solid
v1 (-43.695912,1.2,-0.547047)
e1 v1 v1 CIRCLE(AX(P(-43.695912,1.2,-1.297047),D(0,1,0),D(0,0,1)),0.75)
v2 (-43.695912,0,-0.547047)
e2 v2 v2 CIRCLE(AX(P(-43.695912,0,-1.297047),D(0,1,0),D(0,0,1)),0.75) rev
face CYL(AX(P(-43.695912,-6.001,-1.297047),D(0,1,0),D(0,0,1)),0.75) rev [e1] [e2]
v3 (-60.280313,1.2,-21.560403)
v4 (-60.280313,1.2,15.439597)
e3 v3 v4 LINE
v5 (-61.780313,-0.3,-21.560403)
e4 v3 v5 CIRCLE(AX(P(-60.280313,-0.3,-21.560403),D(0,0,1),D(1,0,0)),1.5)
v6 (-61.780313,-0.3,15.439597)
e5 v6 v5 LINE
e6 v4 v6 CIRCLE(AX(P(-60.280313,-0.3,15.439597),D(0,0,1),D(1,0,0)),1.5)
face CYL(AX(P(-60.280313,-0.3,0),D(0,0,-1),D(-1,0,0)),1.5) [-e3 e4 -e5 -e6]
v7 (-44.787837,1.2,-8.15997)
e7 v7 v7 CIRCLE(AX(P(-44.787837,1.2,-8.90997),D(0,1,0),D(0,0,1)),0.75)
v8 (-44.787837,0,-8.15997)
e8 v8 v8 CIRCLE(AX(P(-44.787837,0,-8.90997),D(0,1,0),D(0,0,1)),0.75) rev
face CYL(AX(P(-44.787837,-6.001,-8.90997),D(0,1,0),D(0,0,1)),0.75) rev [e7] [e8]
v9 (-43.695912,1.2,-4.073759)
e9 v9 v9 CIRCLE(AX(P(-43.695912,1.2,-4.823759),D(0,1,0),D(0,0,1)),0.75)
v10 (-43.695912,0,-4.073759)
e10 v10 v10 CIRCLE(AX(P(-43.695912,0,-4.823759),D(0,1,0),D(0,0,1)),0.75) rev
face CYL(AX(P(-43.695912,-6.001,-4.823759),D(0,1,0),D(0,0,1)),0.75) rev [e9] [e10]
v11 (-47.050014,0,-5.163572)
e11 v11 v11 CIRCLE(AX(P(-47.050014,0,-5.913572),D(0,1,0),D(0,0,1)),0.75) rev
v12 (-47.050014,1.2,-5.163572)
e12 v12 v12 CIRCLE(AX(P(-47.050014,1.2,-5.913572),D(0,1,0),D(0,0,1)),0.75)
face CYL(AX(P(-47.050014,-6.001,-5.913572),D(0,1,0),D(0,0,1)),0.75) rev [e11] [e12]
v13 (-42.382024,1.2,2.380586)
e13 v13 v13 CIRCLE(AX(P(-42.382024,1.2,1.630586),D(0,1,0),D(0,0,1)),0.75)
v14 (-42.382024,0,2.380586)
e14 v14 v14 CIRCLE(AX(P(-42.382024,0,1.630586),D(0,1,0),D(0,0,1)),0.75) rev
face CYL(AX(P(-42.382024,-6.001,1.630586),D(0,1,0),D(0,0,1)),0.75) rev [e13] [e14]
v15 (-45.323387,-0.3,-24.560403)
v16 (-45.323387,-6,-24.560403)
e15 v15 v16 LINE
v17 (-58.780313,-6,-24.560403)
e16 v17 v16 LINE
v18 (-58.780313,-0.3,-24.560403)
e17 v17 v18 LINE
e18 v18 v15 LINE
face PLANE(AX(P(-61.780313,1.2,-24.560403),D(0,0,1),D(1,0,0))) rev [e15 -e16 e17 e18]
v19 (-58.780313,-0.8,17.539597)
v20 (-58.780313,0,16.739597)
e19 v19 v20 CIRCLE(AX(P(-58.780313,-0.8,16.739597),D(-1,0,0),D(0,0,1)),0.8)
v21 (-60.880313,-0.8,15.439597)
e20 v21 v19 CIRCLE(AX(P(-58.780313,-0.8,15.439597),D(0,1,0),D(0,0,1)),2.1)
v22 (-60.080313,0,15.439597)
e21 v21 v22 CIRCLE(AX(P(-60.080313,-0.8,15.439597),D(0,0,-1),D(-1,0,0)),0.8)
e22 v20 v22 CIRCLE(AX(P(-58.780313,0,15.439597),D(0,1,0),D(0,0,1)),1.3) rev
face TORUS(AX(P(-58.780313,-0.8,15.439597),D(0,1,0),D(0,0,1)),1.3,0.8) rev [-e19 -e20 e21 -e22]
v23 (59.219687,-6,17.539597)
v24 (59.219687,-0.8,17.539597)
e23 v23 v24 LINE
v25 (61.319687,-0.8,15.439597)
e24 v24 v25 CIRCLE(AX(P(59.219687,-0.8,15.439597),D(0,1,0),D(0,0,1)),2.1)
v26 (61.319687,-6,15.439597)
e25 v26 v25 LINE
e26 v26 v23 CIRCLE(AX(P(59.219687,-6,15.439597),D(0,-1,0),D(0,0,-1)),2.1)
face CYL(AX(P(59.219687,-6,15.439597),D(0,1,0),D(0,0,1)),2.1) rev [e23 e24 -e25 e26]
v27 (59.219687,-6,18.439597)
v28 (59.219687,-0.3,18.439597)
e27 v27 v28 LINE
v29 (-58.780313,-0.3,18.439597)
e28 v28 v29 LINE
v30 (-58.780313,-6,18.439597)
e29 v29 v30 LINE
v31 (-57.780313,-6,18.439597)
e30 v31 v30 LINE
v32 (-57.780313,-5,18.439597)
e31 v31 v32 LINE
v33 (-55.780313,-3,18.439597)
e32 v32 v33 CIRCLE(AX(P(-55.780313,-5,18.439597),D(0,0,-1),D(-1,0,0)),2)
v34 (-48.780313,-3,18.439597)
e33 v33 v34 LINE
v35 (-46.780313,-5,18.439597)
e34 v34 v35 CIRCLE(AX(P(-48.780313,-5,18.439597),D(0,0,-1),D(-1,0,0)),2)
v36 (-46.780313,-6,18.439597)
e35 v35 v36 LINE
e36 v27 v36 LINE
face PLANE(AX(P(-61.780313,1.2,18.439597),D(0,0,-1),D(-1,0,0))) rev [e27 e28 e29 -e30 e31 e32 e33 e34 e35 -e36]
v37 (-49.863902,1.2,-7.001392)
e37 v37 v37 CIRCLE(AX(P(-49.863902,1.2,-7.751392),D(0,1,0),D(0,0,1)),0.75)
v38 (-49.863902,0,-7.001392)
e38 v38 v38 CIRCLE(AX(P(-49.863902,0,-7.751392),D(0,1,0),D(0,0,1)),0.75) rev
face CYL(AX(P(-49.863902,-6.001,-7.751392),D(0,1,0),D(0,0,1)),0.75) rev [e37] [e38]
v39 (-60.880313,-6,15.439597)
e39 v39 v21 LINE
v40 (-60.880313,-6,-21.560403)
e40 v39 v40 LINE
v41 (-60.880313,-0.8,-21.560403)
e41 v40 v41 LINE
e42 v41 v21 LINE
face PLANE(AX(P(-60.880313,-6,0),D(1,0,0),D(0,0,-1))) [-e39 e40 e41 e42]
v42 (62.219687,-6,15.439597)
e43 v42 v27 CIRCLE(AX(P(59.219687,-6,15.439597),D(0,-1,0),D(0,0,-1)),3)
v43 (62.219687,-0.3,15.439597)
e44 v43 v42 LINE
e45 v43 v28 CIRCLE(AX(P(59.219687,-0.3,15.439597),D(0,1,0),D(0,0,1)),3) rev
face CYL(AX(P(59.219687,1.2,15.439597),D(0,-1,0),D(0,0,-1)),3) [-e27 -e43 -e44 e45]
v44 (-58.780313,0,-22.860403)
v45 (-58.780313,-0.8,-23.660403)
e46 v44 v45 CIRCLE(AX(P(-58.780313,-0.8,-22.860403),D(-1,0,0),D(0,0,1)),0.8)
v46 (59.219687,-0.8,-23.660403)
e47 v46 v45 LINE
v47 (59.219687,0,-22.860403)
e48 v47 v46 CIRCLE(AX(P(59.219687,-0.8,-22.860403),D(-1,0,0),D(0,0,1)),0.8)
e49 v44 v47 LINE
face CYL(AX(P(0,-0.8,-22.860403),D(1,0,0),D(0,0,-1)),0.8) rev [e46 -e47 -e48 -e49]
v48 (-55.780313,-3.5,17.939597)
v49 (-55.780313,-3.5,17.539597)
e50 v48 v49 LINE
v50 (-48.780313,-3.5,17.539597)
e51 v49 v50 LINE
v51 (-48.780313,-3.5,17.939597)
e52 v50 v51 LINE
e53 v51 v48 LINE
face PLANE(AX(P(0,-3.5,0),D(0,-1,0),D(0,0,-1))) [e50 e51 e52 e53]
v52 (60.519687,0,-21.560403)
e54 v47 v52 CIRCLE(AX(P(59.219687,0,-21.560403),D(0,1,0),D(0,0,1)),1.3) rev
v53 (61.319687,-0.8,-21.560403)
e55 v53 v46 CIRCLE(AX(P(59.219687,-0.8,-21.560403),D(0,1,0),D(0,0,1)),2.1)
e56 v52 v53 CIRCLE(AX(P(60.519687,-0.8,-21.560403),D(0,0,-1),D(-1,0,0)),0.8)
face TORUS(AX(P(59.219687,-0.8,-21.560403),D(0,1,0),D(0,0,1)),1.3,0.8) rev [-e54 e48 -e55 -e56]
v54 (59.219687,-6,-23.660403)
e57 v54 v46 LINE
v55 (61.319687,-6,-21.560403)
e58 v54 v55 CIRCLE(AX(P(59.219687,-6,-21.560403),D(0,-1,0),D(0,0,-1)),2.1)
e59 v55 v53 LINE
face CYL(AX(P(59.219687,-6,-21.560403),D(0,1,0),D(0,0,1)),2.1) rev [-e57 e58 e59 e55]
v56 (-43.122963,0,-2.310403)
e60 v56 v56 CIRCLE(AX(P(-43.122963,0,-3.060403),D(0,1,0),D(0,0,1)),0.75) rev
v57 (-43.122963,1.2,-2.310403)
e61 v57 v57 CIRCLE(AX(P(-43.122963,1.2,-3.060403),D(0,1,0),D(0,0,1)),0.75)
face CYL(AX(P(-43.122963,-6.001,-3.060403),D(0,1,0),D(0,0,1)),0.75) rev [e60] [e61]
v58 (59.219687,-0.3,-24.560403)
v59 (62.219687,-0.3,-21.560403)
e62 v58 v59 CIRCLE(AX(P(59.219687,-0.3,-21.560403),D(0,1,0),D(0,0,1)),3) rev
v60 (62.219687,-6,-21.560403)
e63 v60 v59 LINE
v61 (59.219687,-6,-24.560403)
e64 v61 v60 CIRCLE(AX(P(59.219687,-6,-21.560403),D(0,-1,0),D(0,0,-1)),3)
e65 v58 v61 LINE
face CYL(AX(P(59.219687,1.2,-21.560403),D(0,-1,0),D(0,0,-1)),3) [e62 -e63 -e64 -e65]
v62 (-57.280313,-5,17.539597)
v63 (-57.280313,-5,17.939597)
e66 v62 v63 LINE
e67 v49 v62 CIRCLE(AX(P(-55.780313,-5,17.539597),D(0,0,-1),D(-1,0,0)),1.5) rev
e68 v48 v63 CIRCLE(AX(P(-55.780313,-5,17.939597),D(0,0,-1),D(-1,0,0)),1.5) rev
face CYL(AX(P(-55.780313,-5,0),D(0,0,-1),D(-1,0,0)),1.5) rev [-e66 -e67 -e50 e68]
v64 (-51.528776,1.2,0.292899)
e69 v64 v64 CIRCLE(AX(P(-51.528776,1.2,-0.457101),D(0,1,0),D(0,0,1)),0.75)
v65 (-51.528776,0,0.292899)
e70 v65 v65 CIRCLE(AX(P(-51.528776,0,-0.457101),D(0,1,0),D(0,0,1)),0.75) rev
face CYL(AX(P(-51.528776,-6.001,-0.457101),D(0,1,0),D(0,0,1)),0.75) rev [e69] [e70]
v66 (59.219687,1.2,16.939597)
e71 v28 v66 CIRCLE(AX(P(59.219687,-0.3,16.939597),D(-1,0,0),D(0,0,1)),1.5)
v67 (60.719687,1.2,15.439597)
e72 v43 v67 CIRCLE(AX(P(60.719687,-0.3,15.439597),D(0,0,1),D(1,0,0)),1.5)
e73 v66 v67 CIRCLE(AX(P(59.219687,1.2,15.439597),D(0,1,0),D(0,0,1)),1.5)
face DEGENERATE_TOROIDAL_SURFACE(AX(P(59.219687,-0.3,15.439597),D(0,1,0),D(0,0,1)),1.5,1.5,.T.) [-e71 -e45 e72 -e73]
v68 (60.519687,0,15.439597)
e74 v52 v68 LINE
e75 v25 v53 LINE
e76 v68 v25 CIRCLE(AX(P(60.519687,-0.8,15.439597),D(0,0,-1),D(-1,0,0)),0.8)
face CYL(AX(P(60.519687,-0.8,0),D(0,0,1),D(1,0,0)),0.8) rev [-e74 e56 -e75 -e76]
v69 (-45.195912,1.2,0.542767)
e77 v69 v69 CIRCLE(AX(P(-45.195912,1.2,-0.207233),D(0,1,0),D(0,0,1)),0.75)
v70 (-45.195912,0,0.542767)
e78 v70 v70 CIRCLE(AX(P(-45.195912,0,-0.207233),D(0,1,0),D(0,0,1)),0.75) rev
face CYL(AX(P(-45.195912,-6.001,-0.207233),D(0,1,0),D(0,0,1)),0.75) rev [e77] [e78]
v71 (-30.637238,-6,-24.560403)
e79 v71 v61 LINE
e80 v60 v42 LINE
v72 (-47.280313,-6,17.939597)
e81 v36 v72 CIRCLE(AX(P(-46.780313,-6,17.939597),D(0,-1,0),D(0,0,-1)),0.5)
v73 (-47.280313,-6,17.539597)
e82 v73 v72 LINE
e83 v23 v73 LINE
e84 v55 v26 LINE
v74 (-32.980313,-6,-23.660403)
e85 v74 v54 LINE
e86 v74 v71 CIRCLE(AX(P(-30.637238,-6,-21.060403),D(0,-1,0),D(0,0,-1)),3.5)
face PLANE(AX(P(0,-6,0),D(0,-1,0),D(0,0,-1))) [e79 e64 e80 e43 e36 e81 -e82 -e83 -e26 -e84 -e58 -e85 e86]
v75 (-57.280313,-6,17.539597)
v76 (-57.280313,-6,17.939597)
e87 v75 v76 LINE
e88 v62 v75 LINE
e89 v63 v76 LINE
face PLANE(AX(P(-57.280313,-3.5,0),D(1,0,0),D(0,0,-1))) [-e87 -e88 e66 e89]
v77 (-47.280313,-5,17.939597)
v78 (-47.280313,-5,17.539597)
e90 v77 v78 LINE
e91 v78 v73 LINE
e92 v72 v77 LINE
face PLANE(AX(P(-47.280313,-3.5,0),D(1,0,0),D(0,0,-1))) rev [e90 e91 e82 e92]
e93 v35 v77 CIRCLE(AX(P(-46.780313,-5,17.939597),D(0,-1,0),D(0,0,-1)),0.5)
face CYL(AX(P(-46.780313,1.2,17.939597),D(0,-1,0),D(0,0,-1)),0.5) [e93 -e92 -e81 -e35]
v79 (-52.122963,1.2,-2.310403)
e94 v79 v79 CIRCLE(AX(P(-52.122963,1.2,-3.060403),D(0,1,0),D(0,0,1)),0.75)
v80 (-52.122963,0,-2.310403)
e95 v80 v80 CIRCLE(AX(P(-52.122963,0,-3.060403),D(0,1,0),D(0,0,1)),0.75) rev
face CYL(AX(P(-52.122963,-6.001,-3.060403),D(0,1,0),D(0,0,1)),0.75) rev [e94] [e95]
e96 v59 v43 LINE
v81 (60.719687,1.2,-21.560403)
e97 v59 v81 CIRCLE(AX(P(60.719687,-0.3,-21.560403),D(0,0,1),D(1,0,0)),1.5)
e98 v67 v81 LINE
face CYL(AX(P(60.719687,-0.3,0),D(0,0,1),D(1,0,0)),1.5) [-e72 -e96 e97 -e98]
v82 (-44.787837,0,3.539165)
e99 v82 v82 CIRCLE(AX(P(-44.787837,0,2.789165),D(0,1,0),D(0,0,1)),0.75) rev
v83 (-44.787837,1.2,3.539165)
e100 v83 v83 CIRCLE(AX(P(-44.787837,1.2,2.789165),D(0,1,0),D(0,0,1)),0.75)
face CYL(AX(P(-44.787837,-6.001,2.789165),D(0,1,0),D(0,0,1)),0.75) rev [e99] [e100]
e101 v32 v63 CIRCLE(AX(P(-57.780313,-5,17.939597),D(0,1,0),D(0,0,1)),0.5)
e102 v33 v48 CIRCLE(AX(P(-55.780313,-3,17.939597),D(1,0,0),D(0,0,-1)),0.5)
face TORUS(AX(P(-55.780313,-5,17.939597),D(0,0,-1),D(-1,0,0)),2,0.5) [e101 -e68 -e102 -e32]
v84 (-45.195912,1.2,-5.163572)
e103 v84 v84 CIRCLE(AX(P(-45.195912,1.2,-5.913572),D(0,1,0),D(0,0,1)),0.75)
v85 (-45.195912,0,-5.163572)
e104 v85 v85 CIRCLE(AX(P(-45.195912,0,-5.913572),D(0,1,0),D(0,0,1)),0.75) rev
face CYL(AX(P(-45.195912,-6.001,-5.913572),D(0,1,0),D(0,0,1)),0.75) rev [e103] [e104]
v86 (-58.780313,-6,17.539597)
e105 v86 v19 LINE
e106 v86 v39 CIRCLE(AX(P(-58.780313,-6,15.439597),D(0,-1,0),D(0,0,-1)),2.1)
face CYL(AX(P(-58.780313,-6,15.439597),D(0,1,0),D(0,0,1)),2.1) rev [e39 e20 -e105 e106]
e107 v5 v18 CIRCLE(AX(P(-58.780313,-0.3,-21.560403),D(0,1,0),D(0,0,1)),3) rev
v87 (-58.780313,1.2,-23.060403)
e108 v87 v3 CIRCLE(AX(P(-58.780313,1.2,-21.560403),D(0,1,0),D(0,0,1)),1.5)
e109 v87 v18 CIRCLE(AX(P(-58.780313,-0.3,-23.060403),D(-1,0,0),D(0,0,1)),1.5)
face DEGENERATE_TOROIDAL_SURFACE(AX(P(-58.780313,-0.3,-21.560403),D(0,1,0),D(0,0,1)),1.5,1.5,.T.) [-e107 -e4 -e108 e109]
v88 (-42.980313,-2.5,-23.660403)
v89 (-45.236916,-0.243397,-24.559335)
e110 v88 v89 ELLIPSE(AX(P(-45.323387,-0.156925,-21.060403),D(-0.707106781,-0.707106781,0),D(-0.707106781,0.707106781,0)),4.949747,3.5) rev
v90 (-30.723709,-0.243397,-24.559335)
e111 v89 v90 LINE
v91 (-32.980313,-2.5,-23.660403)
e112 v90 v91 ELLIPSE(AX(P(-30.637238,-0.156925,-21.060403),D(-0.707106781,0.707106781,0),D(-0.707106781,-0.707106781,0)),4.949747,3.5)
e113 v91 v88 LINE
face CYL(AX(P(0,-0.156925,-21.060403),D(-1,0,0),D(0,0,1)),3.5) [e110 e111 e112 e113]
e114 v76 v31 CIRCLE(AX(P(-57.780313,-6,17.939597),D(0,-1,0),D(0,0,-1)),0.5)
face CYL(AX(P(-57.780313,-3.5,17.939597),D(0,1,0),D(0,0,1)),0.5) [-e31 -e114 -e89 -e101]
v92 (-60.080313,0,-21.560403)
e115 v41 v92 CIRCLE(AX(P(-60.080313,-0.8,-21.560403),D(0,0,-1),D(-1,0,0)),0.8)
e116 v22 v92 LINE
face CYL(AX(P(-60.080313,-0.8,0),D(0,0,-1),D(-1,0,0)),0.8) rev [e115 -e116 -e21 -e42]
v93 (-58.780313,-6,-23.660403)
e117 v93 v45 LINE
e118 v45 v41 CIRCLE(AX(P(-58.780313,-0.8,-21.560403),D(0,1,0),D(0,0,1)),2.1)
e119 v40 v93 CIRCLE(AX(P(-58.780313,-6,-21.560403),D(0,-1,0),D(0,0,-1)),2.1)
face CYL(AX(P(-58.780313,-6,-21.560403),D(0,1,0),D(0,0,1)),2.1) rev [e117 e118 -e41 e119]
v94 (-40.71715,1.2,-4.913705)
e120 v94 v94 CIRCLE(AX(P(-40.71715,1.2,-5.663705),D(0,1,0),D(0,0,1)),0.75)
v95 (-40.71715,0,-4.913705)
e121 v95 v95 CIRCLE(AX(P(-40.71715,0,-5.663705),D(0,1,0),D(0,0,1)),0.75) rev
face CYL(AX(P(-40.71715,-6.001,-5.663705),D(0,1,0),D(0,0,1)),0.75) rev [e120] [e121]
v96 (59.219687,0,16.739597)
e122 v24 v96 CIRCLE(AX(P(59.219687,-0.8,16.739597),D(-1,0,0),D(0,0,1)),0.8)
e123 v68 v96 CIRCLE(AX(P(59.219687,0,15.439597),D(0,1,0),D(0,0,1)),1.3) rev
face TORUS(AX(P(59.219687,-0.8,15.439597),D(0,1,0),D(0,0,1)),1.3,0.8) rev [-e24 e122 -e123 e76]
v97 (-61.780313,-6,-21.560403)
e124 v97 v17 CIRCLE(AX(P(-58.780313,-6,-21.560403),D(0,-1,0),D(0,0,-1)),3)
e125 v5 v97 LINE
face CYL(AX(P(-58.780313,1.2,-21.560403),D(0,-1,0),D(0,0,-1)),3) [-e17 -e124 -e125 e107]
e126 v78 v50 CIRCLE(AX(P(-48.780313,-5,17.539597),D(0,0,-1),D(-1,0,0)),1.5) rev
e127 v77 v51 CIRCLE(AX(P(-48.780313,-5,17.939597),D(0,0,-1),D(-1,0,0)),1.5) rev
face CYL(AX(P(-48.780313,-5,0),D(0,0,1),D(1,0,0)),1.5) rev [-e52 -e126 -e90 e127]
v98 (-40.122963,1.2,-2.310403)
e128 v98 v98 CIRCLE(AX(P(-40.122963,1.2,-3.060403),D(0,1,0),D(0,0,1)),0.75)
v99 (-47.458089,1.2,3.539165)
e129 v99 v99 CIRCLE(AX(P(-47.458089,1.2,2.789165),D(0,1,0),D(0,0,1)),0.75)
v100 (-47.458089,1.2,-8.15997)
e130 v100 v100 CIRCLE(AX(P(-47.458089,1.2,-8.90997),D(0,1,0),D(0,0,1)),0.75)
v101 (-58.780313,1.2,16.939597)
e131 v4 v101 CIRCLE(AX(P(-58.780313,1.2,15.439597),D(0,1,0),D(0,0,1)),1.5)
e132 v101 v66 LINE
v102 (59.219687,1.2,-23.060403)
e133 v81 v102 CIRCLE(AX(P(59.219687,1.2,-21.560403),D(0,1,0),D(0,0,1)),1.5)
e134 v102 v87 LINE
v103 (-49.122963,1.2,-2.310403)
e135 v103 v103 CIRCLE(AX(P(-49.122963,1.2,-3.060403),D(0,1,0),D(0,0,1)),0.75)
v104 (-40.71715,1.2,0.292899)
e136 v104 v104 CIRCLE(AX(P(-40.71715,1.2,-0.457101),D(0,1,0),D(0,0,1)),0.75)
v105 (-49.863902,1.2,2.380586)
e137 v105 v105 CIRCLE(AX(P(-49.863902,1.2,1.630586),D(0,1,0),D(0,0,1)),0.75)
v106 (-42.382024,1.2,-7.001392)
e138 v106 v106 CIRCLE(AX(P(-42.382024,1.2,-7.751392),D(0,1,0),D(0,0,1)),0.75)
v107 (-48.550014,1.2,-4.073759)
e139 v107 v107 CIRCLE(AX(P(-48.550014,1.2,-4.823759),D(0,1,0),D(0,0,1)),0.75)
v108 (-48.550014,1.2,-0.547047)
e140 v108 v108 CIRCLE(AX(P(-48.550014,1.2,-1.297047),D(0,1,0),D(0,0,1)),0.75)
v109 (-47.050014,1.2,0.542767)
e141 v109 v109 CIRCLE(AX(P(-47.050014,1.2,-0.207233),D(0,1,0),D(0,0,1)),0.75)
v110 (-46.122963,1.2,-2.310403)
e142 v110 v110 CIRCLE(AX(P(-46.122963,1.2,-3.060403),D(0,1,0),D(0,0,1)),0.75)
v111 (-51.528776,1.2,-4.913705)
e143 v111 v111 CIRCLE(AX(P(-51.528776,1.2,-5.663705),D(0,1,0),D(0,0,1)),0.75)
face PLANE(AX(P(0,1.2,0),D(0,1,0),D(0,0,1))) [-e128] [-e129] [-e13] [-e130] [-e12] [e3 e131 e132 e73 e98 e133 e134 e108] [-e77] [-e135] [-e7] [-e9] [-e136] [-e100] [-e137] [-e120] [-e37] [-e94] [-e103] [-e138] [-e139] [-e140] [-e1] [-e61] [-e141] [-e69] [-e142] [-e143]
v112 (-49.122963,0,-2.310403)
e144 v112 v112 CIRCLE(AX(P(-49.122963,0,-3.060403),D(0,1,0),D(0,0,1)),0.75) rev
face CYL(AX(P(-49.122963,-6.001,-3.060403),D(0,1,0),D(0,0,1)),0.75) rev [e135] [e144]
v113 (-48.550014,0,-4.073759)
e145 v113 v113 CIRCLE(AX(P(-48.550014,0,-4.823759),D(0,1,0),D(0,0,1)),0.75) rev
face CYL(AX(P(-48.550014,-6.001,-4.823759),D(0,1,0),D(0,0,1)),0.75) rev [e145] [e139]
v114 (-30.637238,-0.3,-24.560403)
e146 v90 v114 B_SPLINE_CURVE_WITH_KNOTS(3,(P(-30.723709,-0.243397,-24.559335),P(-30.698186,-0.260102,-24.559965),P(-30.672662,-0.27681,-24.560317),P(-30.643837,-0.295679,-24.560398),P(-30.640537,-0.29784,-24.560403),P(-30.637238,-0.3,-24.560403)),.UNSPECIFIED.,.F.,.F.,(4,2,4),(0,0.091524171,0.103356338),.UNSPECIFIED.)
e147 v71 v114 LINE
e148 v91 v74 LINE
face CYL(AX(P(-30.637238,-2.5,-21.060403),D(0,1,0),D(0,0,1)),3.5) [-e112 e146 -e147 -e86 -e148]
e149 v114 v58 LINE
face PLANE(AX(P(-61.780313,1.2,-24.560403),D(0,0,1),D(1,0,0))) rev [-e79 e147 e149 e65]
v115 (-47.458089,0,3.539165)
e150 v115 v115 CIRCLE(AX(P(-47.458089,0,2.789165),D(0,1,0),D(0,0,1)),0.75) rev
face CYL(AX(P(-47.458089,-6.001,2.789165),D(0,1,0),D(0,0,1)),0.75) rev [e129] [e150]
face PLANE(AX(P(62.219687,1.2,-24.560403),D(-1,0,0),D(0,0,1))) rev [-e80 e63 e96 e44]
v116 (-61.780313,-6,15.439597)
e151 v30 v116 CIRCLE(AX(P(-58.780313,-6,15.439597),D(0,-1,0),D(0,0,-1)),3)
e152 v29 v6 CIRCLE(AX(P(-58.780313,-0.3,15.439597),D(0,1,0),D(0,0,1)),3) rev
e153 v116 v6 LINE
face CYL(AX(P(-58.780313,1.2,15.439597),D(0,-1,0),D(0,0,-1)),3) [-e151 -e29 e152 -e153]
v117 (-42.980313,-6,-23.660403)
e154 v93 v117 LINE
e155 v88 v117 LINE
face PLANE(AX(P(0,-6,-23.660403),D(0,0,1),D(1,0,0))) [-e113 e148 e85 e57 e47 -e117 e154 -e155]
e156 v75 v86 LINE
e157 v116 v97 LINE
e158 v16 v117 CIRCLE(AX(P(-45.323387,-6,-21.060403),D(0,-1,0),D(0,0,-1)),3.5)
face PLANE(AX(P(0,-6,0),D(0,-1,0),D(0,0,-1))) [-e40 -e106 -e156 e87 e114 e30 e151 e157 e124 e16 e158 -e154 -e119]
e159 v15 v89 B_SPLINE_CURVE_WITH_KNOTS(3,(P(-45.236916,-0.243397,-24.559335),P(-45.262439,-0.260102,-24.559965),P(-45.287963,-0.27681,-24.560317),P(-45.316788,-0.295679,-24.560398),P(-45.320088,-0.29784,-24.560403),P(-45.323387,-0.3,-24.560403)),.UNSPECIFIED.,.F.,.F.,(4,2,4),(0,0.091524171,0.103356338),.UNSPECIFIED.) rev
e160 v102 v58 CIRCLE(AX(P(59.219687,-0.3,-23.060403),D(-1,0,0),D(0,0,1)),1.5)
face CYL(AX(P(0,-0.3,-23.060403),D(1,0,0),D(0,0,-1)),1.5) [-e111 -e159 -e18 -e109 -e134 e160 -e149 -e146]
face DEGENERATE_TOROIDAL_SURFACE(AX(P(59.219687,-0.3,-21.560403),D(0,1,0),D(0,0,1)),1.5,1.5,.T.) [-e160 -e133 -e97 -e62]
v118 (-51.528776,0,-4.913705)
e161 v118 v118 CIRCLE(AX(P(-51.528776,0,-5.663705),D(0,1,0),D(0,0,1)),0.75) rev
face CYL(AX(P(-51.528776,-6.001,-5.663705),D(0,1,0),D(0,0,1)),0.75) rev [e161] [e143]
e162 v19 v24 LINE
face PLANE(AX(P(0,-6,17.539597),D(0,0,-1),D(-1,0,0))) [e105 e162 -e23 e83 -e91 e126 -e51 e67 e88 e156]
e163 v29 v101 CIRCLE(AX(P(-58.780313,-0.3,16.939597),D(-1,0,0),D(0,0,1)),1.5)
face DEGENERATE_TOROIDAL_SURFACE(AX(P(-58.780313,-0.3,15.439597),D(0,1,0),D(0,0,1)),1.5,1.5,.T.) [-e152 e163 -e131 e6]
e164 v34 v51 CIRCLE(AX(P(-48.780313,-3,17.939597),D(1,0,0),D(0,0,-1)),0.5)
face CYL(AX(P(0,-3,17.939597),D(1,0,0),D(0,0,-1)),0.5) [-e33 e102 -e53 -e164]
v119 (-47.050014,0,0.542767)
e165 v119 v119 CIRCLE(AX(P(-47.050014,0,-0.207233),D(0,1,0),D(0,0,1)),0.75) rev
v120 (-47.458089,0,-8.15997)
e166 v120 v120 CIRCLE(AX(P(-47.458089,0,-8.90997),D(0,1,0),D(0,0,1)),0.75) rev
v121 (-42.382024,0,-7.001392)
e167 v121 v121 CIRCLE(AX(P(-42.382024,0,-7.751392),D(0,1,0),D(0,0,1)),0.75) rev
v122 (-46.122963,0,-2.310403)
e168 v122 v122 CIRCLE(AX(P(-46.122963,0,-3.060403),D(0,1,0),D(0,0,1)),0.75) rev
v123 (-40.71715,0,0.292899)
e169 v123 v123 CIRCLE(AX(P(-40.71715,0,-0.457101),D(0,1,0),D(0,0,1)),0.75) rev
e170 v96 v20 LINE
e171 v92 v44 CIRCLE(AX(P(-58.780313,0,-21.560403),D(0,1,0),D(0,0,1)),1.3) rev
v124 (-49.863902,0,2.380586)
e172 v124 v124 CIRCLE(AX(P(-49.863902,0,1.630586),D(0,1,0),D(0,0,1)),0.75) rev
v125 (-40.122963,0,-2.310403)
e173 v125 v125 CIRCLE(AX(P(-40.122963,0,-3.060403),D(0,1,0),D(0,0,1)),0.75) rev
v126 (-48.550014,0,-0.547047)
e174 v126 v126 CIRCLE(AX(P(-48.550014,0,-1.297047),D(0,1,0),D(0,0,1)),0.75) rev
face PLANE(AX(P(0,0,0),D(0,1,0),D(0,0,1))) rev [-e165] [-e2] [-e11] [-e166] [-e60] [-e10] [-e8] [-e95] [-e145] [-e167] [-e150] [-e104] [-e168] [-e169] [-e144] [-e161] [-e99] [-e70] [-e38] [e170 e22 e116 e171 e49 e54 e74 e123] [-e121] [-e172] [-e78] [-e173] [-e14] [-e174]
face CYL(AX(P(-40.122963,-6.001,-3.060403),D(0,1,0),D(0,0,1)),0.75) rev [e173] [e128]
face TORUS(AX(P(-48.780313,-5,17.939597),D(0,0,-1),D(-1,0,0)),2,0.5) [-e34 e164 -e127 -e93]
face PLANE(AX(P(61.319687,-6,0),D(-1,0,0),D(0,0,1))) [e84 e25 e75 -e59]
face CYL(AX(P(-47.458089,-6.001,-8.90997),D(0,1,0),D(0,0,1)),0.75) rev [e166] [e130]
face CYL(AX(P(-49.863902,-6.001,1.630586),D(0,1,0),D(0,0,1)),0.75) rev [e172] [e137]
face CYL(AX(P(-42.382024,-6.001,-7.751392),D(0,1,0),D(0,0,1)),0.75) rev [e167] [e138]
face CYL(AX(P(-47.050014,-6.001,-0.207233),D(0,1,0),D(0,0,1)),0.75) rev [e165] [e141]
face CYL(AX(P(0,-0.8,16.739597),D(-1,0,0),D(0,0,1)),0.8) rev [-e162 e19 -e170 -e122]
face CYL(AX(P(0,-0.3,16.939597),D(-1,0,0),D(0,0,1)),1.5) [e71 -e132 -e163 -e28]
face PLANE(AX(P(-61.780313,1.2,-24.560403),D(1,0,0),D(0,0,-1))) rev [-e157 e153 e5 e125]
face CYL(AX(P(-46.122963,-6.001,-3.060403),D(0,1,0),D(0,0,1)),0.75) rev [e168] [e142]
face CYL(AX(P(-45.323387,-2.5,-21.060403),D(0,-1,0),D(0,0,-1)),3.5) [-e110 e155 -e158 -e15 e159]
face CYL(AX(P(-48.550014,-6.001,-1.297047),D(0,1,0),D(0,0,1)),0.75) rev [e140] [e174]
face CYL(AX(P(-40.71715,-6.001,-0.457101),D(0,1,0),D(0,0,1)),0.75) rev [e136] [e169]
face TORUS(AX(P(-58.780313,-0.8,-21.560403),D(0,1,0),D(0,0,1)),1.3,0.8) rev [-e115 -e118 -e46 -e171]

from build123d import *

# Parameters (mm, degrees)
SKETCH_1_W          = 124
SKETCH_1_H          = 43
EXTRUDE_1_DEPTH     = 1.2
FILLET_1_R          = 3
EXTRUDE_2_DEPTH     = 6
SKETCH_3_W          = 5
SKETCH_3_H          = 0.9
CUT_EXTRUDE_1_DEPTH = 3.5
FILLET_2_R          = 3.5
SKETCH_4_W          = 10
SKETCH_4_H          = 0.9
CUT_EXTRUDE_2_DEPTH = 2.5
FILLET_3_R          = 1.5
FILLET_4_R          = 0.5
FILLET_5_R          = 1.5
FILLET_6_R          = 0.8
SKETCH_5_R          = 0.75
CUT_EXTRUDE_4_DEPTH = 1.2


with BuildPart() as part:
    # Эскиз1 → Бобышка-Вытянуть1 (new body)
    with BuildSketch(Plane(origin=(0, 0, 0), x_dir=(1, 0, 0), z_dir=(0, 1, 0))):
        with Locations((0.219687452, 3.060402942)):
            Rectangle(SKETCH_1_W, SKETCH_1_H)
    extrude(amount=EXTRUDE_1_DEPTH)

    # Скругление1
    fillet_1_edges = [part.edges().sort_by_distance(p)[0] for p in [
        (62.219687452, 0.6, 18.439597058),
        (-61.780312548, 0.6, 18.439597058),
        (-61.780312548, 0.6, -24.560402942),
        (62.219687452, 0.6, -24.560402942),
    ]]
    fillet(fillet_1_edges, radius=FILLET_1_R)

    # Эскиз2 → Бобышка-Вытянуть2 (add)
    with BuildSketch(Plane.XZ):
        with BuildLine():
            ThreePointArc((-58.780312548, 18.439597058), (-60.901632891, 17.560917402), (-61.780312548, 15.439597058))
            Line((-61.780312548, 15.439597058), (-61.780312548, -21.560402942))
            ThreePointArc((-61.780312548, -21.560402942), (-60.901632891, -23.681723285), (-58.780312548, -24.560402942))
            Line((-58.780312548, -24.560402942), (59.219687452, -24.560402942))
            ThreePointArc((59.219687452, -24.560402942), (61.341007796, -23.681723285), (62.219687452, -21.560402942))
            Line((62.219687452, -21.560402942), (62.219687452, 15.439597058))
            ThreePointArc((62.219687452, 15.439597058), (61.341007796, 17.560917402), (59.219687452, 18.439597058))
            Line((59.219687452, 18.439597058), (-58.780312548, 18.439597058))
        make_face()
        with BuildLine():
            ThreePointArc((-58.780312548, 17.539597058), (-60.265236788, 16.924521299), (-60.880312548, 15.439597058))
            Line((-60.880312548, 15.439597058), (-60.880312548, -21.560402942))
            ThreePointArc((-60.880312548, -21.560402942), (-60.265236788, -23.045327182), (-58.780312548, -23.660402942))
            Line((-58.780312548, -23.660402942), (59.219687452, -23.660402942))
            ThreePointArc((59.219687452, -23.660402942), (60.704611693, -23.045327182), (61.319687452, -21.560402942))
            Line((61.319687452, -21.560402942), (61.319687452, 15.439597058))
            ThreePointArc((61.319687452, 15.439597058), (60.704611693, 16.924521299), (59.219687452, 17.539597058))
            Line((59.219687452, 17.539597058), (-58.780312548, 17.539597058))
        make_face(mode=Mode.SUBTRACT)
    extrude(amount=EXTRUDE_2_DEPTH)

    # Эскиз3 → Вырез-Вытянуть1 (cut)
    with BuildSketch(Plane.XZ.offset(6)):
        with Locations((-35.480312548, -24.110402942)):
            Rectangle(SKETCH_3_W, SKETCH_3_H)
        with Locations((-40.480312548, -24.110402942)):
            Rectangle(SKETCH_3_W, SKETCH_3_H)
    extrude(amount=-CUT_EXTRUDE_1_DEPTH, mode=Mode.SUBTRACT)

    # Скругление2
    # the kernel refuses this fillet: 3.5 mm, written as the material it takes off along each edge
    with BuildSketch(Plane(origin=(-32.980312548, -2.5, -24.560402942), x_dir=(0, 1, 0), z_dir=(-1, 0, 0))) as fillet_2_piece_1:
        with BuildLine():
            CenterArc((2.343074903, -3.5), FILLET_2_R, 90, 42.024627579)
            Line((0, -0.9), (-0.046861498, -0.848))
            ThreePointArc((-0.046861498, -0.848), (-0.07, -0.45), (-0.07, 0))
            Line((-0.07, 0), (0, 0.07))
            Line((0, 0.07), (2.343074903, 0.07))
            Line((2.343074903, 0.07), (2.343074903, 0))
        make_face()
    extrude(amount=10, mode=Mode.SUBTRACT)
    with BuildSketch(Plane(origin=(-32.980312548, -11.857687257, -24.560402942), x_dir=(1, 0, 0), z_dir=(0, 1, 0))) as fillet_2_piece_2:
        with BuildLine():
            CenterArc((2.343074903, -3.5), FILLET_2_R, 90, 42.024627579)
            Line((0, -0.9), (-0.046861498, -0.848))
            ThreePointArc((-0.046861498, -0.848), (-0.07, -0.45), (-0.07, 0))
            Line((-0.07, 0), (0, 0.07))
            Line((0, 0.07), (2.343074903, 0.07))
            Line((2.343074903, 0.07), (2.343074903, 0))
        make_face()
    extrude(amount=9.357687257, mode=Mode.SUBTRACT)
    with BuildSketch(Plane(origin=(-42.980312548, -11.857687257, -24.560402942), x_dir=(-1, 0, 0), z_dir=(0, 1, 0))) as fillet_2_piece_3:
        with BuildLine():
            CenterArc((2.343074903, 3.5), FILLET_2_R, 227.975372421, 42.024627579)
            Line((0, 0.9), (-0.046861498, 0.848))
            ThreePointArc((-0.046861498, 0.848), (-0.07, 0.45), (-0.07, 0))
            Line((-0.07, 0), (0, -0.07))
            Line((0, -0.07), (2.343074903, -0.07))
            Line((2.343074903, -0.07), (2.343074903, 0))
        make_face()
    extrude(amount=9.357687257, mode=Mode.SUBTRACT)
    with BuildSketch(Plane(origin=(-27.122625291, -2.5, -24.560402942), x_dir=(0, 1, 0), z_dir=(-1, 0, 0))) as fillet_2_piece_4a_section:
        with BuildLine():
            CenterArc((2.343074903, -3.5), FILLET_2_R, 90, 42.024627579)
            Line((0, -0.9), (-0.046861498, -0.848))
            ThreePointArc((-0.046861498, -0.848), (-0.07, -0.45), (-0.07, 0))
            Line((-0.07, 0), (0, 0.07))
            Line((0, 0.07), (2.343074903, 0.07))
            Line((2.343074903, 0.07), (2.343074903, 0))
        make_face()
    fillet_2_piece_4a = extrude(amount=15.857687257, mode=Mode.PRIVATE)
    fillet_2_piece_4a = split(fillet_2_piece_4a, bisect_by=Plane(origin=(-32.980312548, -1.859913318, -24.343955654), z_dir=(1, 0, 0)), keep=Keep.TOP, mode=Mode.PRIVATE)
    with BuildSketch(Plane(origin=(-32.980312548, -11.857687257, -24.560402942), x_dir=(1, 0, 0), z_dir=(0, 1, 0))) as fillet_2_piece_4b_section:
        with BuildLine():
            CenterArc((2.343074903, -3.5), FILLET_2_R, 90, 42.024627579)
            Line((0, -0.9), (-0.046861498, -0.848))
            ThreePointArc((-0.046861498, -0.848), (-0.07, -0.45), (-0.07, 0))
            Line((-0.07, 0), (0, 0.07))
            Line((0, 0.07), (2.343074903, 0.07))
            Line((2.343074903, 0.07), (2.343074903, 0))
        make_face()
    fillet_2_piece_4b = extrude(amount=15.215374514, mode=Mode.PRIVATE)
    fillet_2_piece_4b = split(fillet_2_piece_4b, bisect_by=Plane(origin=(-32.340225866, -2.5, -24.343955654), z_dir=(0, 1, 0)), keep=Keep.TOP, mode=Mode.PRIVATE)
    fillet_2_piece_4 = fillet_2_piece_4a & fillet_2_piece_4b
    add(fillet_2_piece_4, mode=Mode.SUBTRACT)
    with BuildSketch(Plane(origin=(-42.980312548, -11.857687257, -24.560402942), x_dir=(-1, 0, 0), z_dir=(0, 1, 0))) as fillet_2_piece_5a_section:
        with BuildLine():
            CenterArc((2.343074903, 3.5), FILLET_2_R, 227.975372421, 42.024627579)
            Line((0, 0.9), (-0.046861498, 0.848))
            ThreePointArc((-0.046861498, 0.848), (-0.07, 0.45), (-0.07, 0))
            Line((-0.07, 0), (0, -0.07))
            Line((0, -0.07), (2.343074903, -0.07))
            Line((2.343074903, -0.07), (2.343074903, 0))
        make_face()
    fillet_2_piece_5a = extrude(amount=15.215374514, mode=Mode.PRIVATE)
    fillet_2_piece_5a = split(fillet_2_piece_5a, bisect_by=Plane(origin=(-43.62039923, -2.5, -24.343955654), z_dir=(0, 1, 0)), keep=Keep.TOP, mode=Mode.PRIVATE)
    with BuildSketch(Plane(origin=(-32.980312548, -2.5, -24.560402942), x_dir=(0, 1, 0), z_dir=(-1, 0, 0))) as fillet_2_piece_5b_section:
        with BuildLine():
            CenterArc((2.343074903, -3.5), FILLET_2_R, 90, 42.024627579)
            Line((0, -0.9), (-0.046861498, -0.848))
            ThreePointArc((-0.046861498, -0.848), (-0.07, -0.45), (-0.07, 0))
            Line((-0.07, 0), (0, 0.07))
            Line((0, 0.07), (2.343074903, 0.07))
            Line((2.343074903, 0.07), (2.343074903, 0))
        make_face()
    fillet_2_piece_5b = extrude(amount=15.857687257, mode=Mode.PRIVATE)
    fillet_2_piece_5b = split(fillet_2_piece_5b, bisect_by=Plane(origin=(-42.980312548, -1.859913318, -24.343955654), z_dir=(-1, 0, 0)), keep=Keep.TOP, mode=Mode.PRIVATE)
    fillet_2_piece_5 = fillet_2_piece_5a & fillet_2_piece_5b
    add(fillet_2_piece_5, mode=Mode.SUBTRACT)

    # Эскиз4 → Вырез-Вытянуть2 (cut)
    with BuildSketch(Plane.XZ.offset(6)):
        with Locations((-52.280312548, 17.989597058)):
            Rectangle(SKETCH_4_W, SKETCH_4_H)
    extrude(amount=-CUT_EXTRUDE_2_DEPTH, mode=Mode.SUBTRACT)

    # Скругление3
    fillet_3_edges = [part.edges().sort_by_distance(p)[0] for p in [
        (-47.280312548, -3.5, 17.989597058),
        (-57.280312548, -3.5, 17.989597058),
    ]]
    fillet(fillet_3_edges, radius=FILLET_3_R)

    # Скругление4
    fillet_4_edges = [part.edges().sort_by_distance(p)[0] for p in [
        (-57.280312548, -5.5, 18.439597058),
        (-52.280312548, -3.5, 18.439597058),
        (-47.280312548, -5.5, 18.439597058),
        (-56.84097272, -3.939339828, 18.439597058),
        (-47.719652376, -3.939339828, 18.439597058),
    ]]
    fillet(fillet_4_edges, radius=FILLET_4_R)

    # Скругление5
    # the kernel refuses this fillet: 1.5 mm, written as the material it takes off along each edge
    with BuildSketch(Plane(origin=(-58.780312548, 1.2, 15.439597058), x_dir=(0, 0, 1), z_dir=(1, 0, 0))) as fillet_5_piece_1:
        with BuildLine():
            CenterArc((3 - FILLET_5_R, FILLET_5_R), FILLET_5_R, 270, 90)
            Line((3 - FILLET_5_R, 0), (3 - FILLET_5_R, -FILLET_5_R * 0.02))
            Line((3 - FILLET_5_R, -FILLET_5_R * 0.02), (3 + FILLET_5_R * 0.02, -FILLET_5_R * 0.02))
            Line((3 + FILLET_5_R * 0.02, -FILLET_5_R * 0.02), (3 + FILLET_5_R * 0.02, FILLET_5_R))
            Line((3 + FILLET_5_R * 0.02, FILLET_5_R), (3, FILLET_5_R))
        make_face()
    revolve(axis=Axis((-58.780312548, 1.2, 15.439597058), (0, -1, 0)), revolution_arc=90, mode=Mode.SUBTRACT)
    with BuildSketch(Plane(origin=(-61.780312548, 1.2, 15.439597058), x_dir=(0, -1, 0), z_dir=(0, 0, -1))) as fillet_5_piece_2:
        with BuildLine():
            CenterArc((FILLET_5_R, -FILLET_5_R), FILLET_5_R, 90, 90)
            Line((0, -FILLET_5_R), (-FILLET_5_R * 0.02, -FILLET_5_R))
            Line((-FILLET_5_R * 0.02, -FILLET_5_R), (-FILLET_5_R * 0.02, FILLET_5_R * 0.02))
            Line((-FILLET_5_R * 0.02, FILLET_5_R * 0.02), (FILLET_5_R, FILLET_5_R * 0.02))
            Line((FILLET_5_R, FILLET_5_R * 0.02), (FILLET_5_R, 0))
        make_face()
    extrude(amount=37, mode=Mode.SUBTRACT)
    with BuildSketch(Plane(origin=(-58.780312548, 1.2, -21.560402942), x_dir=(0, 0, -1), z_dir=(1, 0, 0))) as fillet_5_piece_3:
        with BuildLine():
            CenterArc((3 - FILLET_5_R, -FILLET_5_R), FILLET_5_R, 0, 90)
            Line((3 - FILLET_5_R, 0), (3 - FILLET_5_R, FILLET_5_R * 0.02))
            Line((3 - FILLET_5_R, FILLET_5_R * 0.02), (3 + FILLET_5_R * 0.02, FILLET_5_R * 0.02))
            Line((3 + FILLET_5_R * 0.02, FILLET_5_R * 0.02), (3 + FILLET_5_R * 0.02, -FILLET_5_R))
            Line((3 + FILLET_5_R * 0.02, -FILLET_5_R), (3, -FILLET_5_R))
        make_face()
    revolve(axis=Axis((-58.780312548, 1.2, -21.560402942), (0, 1, 0)), revolution_arc=90, mode=Mode.SUBTRACT)
    with BuildSketch(Plane(origin=(-58.780312548, 1.2, -24.560402942), x_dir=(0, -1, 0), z_dir=(1, 0, 0)), Plane(origin=(59.219687452, 1.2, 18.439597058), x_dir=(0, -1, 0), z_dir=(-1, 0, 0))) as fillet_5_piece_4:
        with BuildLine():
            CenterArc((FILLET_5_R, -FILLET_5_R), FILLET_5_R, 90, 90)
            Line((0, -FILLET_5_R), (-FILLET_5_R * 0.02, -FILLET_5_R))
            Line((-FILLET_5_R * 0.02, -FILLET_5_R), (-FILLET_5_R * 0.02, FILLET_5_R * 0.02))
            Line((-FILLET_5_R * 0.02, FILLET_5_R * 0.02), (FILLET_5_R, FILLET_5_R * 0.02))
            Line((FILLET_5_R, FILLET_5_R * 0.02), (FILLET_5_R, 0))
        make_face()
    extrude(amount=118, mode=Mode.SUBTRACT)
    with BuildSketch(Plane(origin=(59.219687452, 1.2, -21.560402942), x_dir=(0, 0, -1), z_dir=(-1, 0, 0))) as fillet_5_piece_5:
        with BuildLine():
            CenterArc((3 - FILLET_5_R, FILLET_5_R), FILLET_5_R, 270, 90)
            Line((3, FILLET_5_R), (3 + FILLET_5_R * 0.02, FILLET_5_R))
            Line((3 + FILLET_5_R * 0.02, FILLET_5_R), (3 + FILLET_5_R * 0.02, -FILLET_5_R * 0.02))
            Line((3 + FILLET_5_R * 0.02, -FILLET_5_R * 0.02), (3 - FILLET_5_R, -FILLET_5_R * 0.02))
            Line((3 - FILLET_5_R, -FILLET_5_R * 0.02), (3 - FILLET_5_R, 0))
        make_face()
    revolve(axis=Axis((59.219687452, 1.2, -21.560402942), (0, -1, 0)), revolution_arc=90, mode=Mode.SUBTRACT)
    with BuildSketch(Plane(origin=(62.219687452, 1.2, -21.560402942), x_dir=(-1, 0, 0), z_dir=(0, 0, 1))) as fillet_5_piece_6:
        with BuildLine():
            CenterArc((FILLET_5_R, FILLET_5_R), FILLET_5_R, 180, 90)
            Line((0, FILLET_5_R), (-FILLET_5_R * 0.02, FILLET_5_R))
            Line((-FILLET_5_R * 0.02, FILLET_5_R), (-FILLET_5_R * 0.02, -FILLET_5_R * 0.02))
            Line((-FILLET_5_R * 0.02, -FILLET_5_R * 0.02), (FILLET_5_R, -FILLET_5_R * 0.02))
            Line((FILLET_5_R, -FILLET_5_R * 0.02), (FILLET_5_R, 0))
        make_face()
    extrude(amount=37, mode=Mode.SUBTRACT)
    with BuildSketch(Plane(origin=(59.219687452, 1.2, 15.439597058), x_dir=(1, 0, 0), z_dir=(0, 0, -1))) as fillet_5_piece_7:
        with BuildLine():
            CenterArc((3 - FILLET_5_R, FILLET_5_R), FILLET_5_R, 270, 90)
            Line((3 - FILLET_5_R, 0), (3 - FILLET_5_R, -FILLET_5_R * 0.02))
            Line((3 - FILLET_5_R, -FILLET_5_R * 0.02), (3 + FILLET_5_R * 0.02, -FILLET_5_R * 0.02))
            Line((3 + FILLET_5_R * 0.02, -FILLET_5_R * 0.02), (3 + FILLET_5_R * 0.02, FILLET_5_R))
            Line((3 + FILLET_5_R * 0.02, FILLET_5_R), (3, FILLET_5_R))
        make_face()
    revolve(axis=Axis((59.219687452, 1.2, 15.439597058), (0, -1, 0)), revolution_arc=90, mode=Mode.SUBTRACT)

    # Скругление6
    fillet_6_edges = [part.edges().sort_by_distance(p)[0] for p in [
        (-60.265236788, 0, 16.924521299),
        (-60.880312548, 0, -3.060402942),
        (-60.265236788, 0, -23.045327182),
        (0.219687452, 0, -23.660402942),
        (60.704611693, 0, -23.045327182),
        (61.319687452, 0, -3.060402942),
        (60.704611693, 0, 16.924521299),
        (0.219687452, 0, 17.539597058),
    ]]
    fillet(fillet_6_edges, radius=FILLET_6_R)

    # Эскиз5 → Вырез-Вытянуть4 (cut)
    with BuildSketch(Plane(origin=(0, 1.2, 0), x_dir=(1, 0, 0), z_dir=(0, 1, 0))):
        with BuildLine():
            ThreePointArc((-51.372963065, 3.060402942), (-52.122963065, 3.810402942), (-52.872963065, 3.060402942))
            Line((-52.872963065, 3.060402942), (-51.372963065, 3.060402942))
        make_face()
        with BuildLine():
            Line((-51.372963065, 3.060402942), (-52.872963065, 3.060402942))
            ThreePointArc((-52.872963065, 3.060402942), (-52.122963065, 2.310402942), (-51.372963065, 3.060402942))
        make_face()
        with BuildLine():
            ThreePointArc((-48.372963065, 3.060402942), (-49.122963065, 3.810402942), (-49.872963065, 3.060402942))
            Line((-49.872963065, 3.060402942), (-48.372963065, 3.060402942))
        make_face()
        with BuildLine():
            Line((-48.372963065, 3.060402942), (-49.872963065, 3.060402942))
            ThreePointArc((-49.872963065, 3.060402942), (-49.122963065, 2.310402942), (-48.372963065, 3.060402942))
        make_face()
        with BuildLine():
            ThreePointArc((-45.372963065, 3.060402942), (-46.122963065, 3.810402942), (-46.872963065, 3.060402942))
            Line((-46.872963065, 3.060402942), (-45.372963065, 3.060402942))
        make_face()
        with BuildLine():
            Line((-45.372963065, 3.060402942), (-46.872963065, 3.060402942))
            ThreePointArc((-46.872963065, 3.060402942), (-46.122963065, 2.310402942), (-45.372963065, 3.060402942))
        make_face()
        with BuildLine():
            ThreePointArc((-42.372963065, 3.060402942), (-43.122963065, 3.810402942), (-43.872963065, 3.060402942))
            Line((-43.872963065, 3.060402942), (-42.372963065, 3.060402942))
        make_face()
        with BuildLine():
            Line((-42.372963065, 3.060402942), (-43.872963065, 3.060402942))
            ThreePointArc((-43.872963065, 3.060402942), (-43.122963065, 2.310402942), (-42.372963065, 3.060402942))
        make_face()
        with BuildLine():
            ThreePointArc((-39.372963065, 3.060402942), (-40.122963065, 3.810402942), (-40.872963065, 3.060402942))
            Line((-40.872963065, 3.060402942), (-39.372963065, 3.060402942))
        make_face()
        with BuildLine():
            Line((-39.372963065, 3.060402942), (-40.872963065, 3.060402942))
            ThreePointArc((-40.872963065, 3.060402942), (-40.122963065, 2.310402942), (-39.372963065, 3.060402942))
        make_face()
        with Locations(Location((-43.695912081, 4.823758699, 0), (0, 0, 270))):
            Circle(SKETCH_5_R)
        with Locations(Location((-45.195912081, 5.913572491, 0), (0, 0, 270))):
            Circle(SKETCH_5_R)
        with Locations(Location((-47.050014048, 5.913572491, 0), (0, 0, 270))):
            Circle(SKETCH_5_R)
        with Locations(Location((-48.550014048, 4.823758699, 0), (0, 0, 270))):
            Circle(SKETCH_5_R)
        with Locations(Location((-51.528776272, 5.663705376, 0), (0, 0, 270))):
            Circle(SKETCH_5_R)
        with Locations(Location((-49.863901876, 7.751391836, 0), (0, 0, 270))):
            Circle(SKETCH_5_R)
        with Locations(Location((-47.458088668, 8.909970415, 0), (0, 0, 270))):
            Circle(SKETCH_5_R)
        with Locations(Location((-44.787837461, 8.909970415, 0), (0, 0, 270))):
            Circle(SKETCH_5_R)
        with Locations(Location((-42.382024253, 7.751391836, 0), (0, 0, 270))):
            Circle(SKETCH_5_R)
        with Locations(Location((-40.717149857, 5.663705376, 0), (0, 0, 270))):
            Circle(SKETCH_5_R)
        with Locations(Location((-40.717149857, 0.457100507, 0), (0, 0, 270))):
            Circle(SKETCH_5_R)
        with Locations(Location((-42.382024253, -1.630585953, 0), (0, 0, 270))):
            Circle(SKETCH_5_R)
        with Locations(Location((-44.787837461, -2.789164531, 0), (0, 0, 270))):
            Circle(SKETCH_5_R)
        with Locations(Location((-47.458088668, -2.789164531, 0), (0, 0, 270))):
            Circle(SKETCH_5_R)
        with Locations(Location((-51.528776272, 0.457100507, 0), (0, 0, 270))):
            Circle(SKETCH_5_R)
        with Locations(Location((-48.550014048, 1.297047185, 0), (0, 0, 270))):
            Circle(SKETCH_5_R)
        with Locations(Location((-43.695912081, 1.297047185, 0), (0, 0, 270))):
            Circle(SKETCH_5_R)
        with Locations(Location((-49.863901876, -1.630585953, 0), (0, 0, 270))):
            Circle(SKETCH_5_R)
        with Locations(Location((-47.050014048, 0.207233393, 0), (0, 0, 270))):
            Circle(SKETCH_5_R)
        with Locations(Location((-45.195912081, 0.207233393, 0), (0, 0, 270))):
            Circle(SKETCH_5_R)
    extrude(amount=-CUT_EXTRUDE_4_DEPTH, mode=Mode.SUBTRACT)


solid = part.part
